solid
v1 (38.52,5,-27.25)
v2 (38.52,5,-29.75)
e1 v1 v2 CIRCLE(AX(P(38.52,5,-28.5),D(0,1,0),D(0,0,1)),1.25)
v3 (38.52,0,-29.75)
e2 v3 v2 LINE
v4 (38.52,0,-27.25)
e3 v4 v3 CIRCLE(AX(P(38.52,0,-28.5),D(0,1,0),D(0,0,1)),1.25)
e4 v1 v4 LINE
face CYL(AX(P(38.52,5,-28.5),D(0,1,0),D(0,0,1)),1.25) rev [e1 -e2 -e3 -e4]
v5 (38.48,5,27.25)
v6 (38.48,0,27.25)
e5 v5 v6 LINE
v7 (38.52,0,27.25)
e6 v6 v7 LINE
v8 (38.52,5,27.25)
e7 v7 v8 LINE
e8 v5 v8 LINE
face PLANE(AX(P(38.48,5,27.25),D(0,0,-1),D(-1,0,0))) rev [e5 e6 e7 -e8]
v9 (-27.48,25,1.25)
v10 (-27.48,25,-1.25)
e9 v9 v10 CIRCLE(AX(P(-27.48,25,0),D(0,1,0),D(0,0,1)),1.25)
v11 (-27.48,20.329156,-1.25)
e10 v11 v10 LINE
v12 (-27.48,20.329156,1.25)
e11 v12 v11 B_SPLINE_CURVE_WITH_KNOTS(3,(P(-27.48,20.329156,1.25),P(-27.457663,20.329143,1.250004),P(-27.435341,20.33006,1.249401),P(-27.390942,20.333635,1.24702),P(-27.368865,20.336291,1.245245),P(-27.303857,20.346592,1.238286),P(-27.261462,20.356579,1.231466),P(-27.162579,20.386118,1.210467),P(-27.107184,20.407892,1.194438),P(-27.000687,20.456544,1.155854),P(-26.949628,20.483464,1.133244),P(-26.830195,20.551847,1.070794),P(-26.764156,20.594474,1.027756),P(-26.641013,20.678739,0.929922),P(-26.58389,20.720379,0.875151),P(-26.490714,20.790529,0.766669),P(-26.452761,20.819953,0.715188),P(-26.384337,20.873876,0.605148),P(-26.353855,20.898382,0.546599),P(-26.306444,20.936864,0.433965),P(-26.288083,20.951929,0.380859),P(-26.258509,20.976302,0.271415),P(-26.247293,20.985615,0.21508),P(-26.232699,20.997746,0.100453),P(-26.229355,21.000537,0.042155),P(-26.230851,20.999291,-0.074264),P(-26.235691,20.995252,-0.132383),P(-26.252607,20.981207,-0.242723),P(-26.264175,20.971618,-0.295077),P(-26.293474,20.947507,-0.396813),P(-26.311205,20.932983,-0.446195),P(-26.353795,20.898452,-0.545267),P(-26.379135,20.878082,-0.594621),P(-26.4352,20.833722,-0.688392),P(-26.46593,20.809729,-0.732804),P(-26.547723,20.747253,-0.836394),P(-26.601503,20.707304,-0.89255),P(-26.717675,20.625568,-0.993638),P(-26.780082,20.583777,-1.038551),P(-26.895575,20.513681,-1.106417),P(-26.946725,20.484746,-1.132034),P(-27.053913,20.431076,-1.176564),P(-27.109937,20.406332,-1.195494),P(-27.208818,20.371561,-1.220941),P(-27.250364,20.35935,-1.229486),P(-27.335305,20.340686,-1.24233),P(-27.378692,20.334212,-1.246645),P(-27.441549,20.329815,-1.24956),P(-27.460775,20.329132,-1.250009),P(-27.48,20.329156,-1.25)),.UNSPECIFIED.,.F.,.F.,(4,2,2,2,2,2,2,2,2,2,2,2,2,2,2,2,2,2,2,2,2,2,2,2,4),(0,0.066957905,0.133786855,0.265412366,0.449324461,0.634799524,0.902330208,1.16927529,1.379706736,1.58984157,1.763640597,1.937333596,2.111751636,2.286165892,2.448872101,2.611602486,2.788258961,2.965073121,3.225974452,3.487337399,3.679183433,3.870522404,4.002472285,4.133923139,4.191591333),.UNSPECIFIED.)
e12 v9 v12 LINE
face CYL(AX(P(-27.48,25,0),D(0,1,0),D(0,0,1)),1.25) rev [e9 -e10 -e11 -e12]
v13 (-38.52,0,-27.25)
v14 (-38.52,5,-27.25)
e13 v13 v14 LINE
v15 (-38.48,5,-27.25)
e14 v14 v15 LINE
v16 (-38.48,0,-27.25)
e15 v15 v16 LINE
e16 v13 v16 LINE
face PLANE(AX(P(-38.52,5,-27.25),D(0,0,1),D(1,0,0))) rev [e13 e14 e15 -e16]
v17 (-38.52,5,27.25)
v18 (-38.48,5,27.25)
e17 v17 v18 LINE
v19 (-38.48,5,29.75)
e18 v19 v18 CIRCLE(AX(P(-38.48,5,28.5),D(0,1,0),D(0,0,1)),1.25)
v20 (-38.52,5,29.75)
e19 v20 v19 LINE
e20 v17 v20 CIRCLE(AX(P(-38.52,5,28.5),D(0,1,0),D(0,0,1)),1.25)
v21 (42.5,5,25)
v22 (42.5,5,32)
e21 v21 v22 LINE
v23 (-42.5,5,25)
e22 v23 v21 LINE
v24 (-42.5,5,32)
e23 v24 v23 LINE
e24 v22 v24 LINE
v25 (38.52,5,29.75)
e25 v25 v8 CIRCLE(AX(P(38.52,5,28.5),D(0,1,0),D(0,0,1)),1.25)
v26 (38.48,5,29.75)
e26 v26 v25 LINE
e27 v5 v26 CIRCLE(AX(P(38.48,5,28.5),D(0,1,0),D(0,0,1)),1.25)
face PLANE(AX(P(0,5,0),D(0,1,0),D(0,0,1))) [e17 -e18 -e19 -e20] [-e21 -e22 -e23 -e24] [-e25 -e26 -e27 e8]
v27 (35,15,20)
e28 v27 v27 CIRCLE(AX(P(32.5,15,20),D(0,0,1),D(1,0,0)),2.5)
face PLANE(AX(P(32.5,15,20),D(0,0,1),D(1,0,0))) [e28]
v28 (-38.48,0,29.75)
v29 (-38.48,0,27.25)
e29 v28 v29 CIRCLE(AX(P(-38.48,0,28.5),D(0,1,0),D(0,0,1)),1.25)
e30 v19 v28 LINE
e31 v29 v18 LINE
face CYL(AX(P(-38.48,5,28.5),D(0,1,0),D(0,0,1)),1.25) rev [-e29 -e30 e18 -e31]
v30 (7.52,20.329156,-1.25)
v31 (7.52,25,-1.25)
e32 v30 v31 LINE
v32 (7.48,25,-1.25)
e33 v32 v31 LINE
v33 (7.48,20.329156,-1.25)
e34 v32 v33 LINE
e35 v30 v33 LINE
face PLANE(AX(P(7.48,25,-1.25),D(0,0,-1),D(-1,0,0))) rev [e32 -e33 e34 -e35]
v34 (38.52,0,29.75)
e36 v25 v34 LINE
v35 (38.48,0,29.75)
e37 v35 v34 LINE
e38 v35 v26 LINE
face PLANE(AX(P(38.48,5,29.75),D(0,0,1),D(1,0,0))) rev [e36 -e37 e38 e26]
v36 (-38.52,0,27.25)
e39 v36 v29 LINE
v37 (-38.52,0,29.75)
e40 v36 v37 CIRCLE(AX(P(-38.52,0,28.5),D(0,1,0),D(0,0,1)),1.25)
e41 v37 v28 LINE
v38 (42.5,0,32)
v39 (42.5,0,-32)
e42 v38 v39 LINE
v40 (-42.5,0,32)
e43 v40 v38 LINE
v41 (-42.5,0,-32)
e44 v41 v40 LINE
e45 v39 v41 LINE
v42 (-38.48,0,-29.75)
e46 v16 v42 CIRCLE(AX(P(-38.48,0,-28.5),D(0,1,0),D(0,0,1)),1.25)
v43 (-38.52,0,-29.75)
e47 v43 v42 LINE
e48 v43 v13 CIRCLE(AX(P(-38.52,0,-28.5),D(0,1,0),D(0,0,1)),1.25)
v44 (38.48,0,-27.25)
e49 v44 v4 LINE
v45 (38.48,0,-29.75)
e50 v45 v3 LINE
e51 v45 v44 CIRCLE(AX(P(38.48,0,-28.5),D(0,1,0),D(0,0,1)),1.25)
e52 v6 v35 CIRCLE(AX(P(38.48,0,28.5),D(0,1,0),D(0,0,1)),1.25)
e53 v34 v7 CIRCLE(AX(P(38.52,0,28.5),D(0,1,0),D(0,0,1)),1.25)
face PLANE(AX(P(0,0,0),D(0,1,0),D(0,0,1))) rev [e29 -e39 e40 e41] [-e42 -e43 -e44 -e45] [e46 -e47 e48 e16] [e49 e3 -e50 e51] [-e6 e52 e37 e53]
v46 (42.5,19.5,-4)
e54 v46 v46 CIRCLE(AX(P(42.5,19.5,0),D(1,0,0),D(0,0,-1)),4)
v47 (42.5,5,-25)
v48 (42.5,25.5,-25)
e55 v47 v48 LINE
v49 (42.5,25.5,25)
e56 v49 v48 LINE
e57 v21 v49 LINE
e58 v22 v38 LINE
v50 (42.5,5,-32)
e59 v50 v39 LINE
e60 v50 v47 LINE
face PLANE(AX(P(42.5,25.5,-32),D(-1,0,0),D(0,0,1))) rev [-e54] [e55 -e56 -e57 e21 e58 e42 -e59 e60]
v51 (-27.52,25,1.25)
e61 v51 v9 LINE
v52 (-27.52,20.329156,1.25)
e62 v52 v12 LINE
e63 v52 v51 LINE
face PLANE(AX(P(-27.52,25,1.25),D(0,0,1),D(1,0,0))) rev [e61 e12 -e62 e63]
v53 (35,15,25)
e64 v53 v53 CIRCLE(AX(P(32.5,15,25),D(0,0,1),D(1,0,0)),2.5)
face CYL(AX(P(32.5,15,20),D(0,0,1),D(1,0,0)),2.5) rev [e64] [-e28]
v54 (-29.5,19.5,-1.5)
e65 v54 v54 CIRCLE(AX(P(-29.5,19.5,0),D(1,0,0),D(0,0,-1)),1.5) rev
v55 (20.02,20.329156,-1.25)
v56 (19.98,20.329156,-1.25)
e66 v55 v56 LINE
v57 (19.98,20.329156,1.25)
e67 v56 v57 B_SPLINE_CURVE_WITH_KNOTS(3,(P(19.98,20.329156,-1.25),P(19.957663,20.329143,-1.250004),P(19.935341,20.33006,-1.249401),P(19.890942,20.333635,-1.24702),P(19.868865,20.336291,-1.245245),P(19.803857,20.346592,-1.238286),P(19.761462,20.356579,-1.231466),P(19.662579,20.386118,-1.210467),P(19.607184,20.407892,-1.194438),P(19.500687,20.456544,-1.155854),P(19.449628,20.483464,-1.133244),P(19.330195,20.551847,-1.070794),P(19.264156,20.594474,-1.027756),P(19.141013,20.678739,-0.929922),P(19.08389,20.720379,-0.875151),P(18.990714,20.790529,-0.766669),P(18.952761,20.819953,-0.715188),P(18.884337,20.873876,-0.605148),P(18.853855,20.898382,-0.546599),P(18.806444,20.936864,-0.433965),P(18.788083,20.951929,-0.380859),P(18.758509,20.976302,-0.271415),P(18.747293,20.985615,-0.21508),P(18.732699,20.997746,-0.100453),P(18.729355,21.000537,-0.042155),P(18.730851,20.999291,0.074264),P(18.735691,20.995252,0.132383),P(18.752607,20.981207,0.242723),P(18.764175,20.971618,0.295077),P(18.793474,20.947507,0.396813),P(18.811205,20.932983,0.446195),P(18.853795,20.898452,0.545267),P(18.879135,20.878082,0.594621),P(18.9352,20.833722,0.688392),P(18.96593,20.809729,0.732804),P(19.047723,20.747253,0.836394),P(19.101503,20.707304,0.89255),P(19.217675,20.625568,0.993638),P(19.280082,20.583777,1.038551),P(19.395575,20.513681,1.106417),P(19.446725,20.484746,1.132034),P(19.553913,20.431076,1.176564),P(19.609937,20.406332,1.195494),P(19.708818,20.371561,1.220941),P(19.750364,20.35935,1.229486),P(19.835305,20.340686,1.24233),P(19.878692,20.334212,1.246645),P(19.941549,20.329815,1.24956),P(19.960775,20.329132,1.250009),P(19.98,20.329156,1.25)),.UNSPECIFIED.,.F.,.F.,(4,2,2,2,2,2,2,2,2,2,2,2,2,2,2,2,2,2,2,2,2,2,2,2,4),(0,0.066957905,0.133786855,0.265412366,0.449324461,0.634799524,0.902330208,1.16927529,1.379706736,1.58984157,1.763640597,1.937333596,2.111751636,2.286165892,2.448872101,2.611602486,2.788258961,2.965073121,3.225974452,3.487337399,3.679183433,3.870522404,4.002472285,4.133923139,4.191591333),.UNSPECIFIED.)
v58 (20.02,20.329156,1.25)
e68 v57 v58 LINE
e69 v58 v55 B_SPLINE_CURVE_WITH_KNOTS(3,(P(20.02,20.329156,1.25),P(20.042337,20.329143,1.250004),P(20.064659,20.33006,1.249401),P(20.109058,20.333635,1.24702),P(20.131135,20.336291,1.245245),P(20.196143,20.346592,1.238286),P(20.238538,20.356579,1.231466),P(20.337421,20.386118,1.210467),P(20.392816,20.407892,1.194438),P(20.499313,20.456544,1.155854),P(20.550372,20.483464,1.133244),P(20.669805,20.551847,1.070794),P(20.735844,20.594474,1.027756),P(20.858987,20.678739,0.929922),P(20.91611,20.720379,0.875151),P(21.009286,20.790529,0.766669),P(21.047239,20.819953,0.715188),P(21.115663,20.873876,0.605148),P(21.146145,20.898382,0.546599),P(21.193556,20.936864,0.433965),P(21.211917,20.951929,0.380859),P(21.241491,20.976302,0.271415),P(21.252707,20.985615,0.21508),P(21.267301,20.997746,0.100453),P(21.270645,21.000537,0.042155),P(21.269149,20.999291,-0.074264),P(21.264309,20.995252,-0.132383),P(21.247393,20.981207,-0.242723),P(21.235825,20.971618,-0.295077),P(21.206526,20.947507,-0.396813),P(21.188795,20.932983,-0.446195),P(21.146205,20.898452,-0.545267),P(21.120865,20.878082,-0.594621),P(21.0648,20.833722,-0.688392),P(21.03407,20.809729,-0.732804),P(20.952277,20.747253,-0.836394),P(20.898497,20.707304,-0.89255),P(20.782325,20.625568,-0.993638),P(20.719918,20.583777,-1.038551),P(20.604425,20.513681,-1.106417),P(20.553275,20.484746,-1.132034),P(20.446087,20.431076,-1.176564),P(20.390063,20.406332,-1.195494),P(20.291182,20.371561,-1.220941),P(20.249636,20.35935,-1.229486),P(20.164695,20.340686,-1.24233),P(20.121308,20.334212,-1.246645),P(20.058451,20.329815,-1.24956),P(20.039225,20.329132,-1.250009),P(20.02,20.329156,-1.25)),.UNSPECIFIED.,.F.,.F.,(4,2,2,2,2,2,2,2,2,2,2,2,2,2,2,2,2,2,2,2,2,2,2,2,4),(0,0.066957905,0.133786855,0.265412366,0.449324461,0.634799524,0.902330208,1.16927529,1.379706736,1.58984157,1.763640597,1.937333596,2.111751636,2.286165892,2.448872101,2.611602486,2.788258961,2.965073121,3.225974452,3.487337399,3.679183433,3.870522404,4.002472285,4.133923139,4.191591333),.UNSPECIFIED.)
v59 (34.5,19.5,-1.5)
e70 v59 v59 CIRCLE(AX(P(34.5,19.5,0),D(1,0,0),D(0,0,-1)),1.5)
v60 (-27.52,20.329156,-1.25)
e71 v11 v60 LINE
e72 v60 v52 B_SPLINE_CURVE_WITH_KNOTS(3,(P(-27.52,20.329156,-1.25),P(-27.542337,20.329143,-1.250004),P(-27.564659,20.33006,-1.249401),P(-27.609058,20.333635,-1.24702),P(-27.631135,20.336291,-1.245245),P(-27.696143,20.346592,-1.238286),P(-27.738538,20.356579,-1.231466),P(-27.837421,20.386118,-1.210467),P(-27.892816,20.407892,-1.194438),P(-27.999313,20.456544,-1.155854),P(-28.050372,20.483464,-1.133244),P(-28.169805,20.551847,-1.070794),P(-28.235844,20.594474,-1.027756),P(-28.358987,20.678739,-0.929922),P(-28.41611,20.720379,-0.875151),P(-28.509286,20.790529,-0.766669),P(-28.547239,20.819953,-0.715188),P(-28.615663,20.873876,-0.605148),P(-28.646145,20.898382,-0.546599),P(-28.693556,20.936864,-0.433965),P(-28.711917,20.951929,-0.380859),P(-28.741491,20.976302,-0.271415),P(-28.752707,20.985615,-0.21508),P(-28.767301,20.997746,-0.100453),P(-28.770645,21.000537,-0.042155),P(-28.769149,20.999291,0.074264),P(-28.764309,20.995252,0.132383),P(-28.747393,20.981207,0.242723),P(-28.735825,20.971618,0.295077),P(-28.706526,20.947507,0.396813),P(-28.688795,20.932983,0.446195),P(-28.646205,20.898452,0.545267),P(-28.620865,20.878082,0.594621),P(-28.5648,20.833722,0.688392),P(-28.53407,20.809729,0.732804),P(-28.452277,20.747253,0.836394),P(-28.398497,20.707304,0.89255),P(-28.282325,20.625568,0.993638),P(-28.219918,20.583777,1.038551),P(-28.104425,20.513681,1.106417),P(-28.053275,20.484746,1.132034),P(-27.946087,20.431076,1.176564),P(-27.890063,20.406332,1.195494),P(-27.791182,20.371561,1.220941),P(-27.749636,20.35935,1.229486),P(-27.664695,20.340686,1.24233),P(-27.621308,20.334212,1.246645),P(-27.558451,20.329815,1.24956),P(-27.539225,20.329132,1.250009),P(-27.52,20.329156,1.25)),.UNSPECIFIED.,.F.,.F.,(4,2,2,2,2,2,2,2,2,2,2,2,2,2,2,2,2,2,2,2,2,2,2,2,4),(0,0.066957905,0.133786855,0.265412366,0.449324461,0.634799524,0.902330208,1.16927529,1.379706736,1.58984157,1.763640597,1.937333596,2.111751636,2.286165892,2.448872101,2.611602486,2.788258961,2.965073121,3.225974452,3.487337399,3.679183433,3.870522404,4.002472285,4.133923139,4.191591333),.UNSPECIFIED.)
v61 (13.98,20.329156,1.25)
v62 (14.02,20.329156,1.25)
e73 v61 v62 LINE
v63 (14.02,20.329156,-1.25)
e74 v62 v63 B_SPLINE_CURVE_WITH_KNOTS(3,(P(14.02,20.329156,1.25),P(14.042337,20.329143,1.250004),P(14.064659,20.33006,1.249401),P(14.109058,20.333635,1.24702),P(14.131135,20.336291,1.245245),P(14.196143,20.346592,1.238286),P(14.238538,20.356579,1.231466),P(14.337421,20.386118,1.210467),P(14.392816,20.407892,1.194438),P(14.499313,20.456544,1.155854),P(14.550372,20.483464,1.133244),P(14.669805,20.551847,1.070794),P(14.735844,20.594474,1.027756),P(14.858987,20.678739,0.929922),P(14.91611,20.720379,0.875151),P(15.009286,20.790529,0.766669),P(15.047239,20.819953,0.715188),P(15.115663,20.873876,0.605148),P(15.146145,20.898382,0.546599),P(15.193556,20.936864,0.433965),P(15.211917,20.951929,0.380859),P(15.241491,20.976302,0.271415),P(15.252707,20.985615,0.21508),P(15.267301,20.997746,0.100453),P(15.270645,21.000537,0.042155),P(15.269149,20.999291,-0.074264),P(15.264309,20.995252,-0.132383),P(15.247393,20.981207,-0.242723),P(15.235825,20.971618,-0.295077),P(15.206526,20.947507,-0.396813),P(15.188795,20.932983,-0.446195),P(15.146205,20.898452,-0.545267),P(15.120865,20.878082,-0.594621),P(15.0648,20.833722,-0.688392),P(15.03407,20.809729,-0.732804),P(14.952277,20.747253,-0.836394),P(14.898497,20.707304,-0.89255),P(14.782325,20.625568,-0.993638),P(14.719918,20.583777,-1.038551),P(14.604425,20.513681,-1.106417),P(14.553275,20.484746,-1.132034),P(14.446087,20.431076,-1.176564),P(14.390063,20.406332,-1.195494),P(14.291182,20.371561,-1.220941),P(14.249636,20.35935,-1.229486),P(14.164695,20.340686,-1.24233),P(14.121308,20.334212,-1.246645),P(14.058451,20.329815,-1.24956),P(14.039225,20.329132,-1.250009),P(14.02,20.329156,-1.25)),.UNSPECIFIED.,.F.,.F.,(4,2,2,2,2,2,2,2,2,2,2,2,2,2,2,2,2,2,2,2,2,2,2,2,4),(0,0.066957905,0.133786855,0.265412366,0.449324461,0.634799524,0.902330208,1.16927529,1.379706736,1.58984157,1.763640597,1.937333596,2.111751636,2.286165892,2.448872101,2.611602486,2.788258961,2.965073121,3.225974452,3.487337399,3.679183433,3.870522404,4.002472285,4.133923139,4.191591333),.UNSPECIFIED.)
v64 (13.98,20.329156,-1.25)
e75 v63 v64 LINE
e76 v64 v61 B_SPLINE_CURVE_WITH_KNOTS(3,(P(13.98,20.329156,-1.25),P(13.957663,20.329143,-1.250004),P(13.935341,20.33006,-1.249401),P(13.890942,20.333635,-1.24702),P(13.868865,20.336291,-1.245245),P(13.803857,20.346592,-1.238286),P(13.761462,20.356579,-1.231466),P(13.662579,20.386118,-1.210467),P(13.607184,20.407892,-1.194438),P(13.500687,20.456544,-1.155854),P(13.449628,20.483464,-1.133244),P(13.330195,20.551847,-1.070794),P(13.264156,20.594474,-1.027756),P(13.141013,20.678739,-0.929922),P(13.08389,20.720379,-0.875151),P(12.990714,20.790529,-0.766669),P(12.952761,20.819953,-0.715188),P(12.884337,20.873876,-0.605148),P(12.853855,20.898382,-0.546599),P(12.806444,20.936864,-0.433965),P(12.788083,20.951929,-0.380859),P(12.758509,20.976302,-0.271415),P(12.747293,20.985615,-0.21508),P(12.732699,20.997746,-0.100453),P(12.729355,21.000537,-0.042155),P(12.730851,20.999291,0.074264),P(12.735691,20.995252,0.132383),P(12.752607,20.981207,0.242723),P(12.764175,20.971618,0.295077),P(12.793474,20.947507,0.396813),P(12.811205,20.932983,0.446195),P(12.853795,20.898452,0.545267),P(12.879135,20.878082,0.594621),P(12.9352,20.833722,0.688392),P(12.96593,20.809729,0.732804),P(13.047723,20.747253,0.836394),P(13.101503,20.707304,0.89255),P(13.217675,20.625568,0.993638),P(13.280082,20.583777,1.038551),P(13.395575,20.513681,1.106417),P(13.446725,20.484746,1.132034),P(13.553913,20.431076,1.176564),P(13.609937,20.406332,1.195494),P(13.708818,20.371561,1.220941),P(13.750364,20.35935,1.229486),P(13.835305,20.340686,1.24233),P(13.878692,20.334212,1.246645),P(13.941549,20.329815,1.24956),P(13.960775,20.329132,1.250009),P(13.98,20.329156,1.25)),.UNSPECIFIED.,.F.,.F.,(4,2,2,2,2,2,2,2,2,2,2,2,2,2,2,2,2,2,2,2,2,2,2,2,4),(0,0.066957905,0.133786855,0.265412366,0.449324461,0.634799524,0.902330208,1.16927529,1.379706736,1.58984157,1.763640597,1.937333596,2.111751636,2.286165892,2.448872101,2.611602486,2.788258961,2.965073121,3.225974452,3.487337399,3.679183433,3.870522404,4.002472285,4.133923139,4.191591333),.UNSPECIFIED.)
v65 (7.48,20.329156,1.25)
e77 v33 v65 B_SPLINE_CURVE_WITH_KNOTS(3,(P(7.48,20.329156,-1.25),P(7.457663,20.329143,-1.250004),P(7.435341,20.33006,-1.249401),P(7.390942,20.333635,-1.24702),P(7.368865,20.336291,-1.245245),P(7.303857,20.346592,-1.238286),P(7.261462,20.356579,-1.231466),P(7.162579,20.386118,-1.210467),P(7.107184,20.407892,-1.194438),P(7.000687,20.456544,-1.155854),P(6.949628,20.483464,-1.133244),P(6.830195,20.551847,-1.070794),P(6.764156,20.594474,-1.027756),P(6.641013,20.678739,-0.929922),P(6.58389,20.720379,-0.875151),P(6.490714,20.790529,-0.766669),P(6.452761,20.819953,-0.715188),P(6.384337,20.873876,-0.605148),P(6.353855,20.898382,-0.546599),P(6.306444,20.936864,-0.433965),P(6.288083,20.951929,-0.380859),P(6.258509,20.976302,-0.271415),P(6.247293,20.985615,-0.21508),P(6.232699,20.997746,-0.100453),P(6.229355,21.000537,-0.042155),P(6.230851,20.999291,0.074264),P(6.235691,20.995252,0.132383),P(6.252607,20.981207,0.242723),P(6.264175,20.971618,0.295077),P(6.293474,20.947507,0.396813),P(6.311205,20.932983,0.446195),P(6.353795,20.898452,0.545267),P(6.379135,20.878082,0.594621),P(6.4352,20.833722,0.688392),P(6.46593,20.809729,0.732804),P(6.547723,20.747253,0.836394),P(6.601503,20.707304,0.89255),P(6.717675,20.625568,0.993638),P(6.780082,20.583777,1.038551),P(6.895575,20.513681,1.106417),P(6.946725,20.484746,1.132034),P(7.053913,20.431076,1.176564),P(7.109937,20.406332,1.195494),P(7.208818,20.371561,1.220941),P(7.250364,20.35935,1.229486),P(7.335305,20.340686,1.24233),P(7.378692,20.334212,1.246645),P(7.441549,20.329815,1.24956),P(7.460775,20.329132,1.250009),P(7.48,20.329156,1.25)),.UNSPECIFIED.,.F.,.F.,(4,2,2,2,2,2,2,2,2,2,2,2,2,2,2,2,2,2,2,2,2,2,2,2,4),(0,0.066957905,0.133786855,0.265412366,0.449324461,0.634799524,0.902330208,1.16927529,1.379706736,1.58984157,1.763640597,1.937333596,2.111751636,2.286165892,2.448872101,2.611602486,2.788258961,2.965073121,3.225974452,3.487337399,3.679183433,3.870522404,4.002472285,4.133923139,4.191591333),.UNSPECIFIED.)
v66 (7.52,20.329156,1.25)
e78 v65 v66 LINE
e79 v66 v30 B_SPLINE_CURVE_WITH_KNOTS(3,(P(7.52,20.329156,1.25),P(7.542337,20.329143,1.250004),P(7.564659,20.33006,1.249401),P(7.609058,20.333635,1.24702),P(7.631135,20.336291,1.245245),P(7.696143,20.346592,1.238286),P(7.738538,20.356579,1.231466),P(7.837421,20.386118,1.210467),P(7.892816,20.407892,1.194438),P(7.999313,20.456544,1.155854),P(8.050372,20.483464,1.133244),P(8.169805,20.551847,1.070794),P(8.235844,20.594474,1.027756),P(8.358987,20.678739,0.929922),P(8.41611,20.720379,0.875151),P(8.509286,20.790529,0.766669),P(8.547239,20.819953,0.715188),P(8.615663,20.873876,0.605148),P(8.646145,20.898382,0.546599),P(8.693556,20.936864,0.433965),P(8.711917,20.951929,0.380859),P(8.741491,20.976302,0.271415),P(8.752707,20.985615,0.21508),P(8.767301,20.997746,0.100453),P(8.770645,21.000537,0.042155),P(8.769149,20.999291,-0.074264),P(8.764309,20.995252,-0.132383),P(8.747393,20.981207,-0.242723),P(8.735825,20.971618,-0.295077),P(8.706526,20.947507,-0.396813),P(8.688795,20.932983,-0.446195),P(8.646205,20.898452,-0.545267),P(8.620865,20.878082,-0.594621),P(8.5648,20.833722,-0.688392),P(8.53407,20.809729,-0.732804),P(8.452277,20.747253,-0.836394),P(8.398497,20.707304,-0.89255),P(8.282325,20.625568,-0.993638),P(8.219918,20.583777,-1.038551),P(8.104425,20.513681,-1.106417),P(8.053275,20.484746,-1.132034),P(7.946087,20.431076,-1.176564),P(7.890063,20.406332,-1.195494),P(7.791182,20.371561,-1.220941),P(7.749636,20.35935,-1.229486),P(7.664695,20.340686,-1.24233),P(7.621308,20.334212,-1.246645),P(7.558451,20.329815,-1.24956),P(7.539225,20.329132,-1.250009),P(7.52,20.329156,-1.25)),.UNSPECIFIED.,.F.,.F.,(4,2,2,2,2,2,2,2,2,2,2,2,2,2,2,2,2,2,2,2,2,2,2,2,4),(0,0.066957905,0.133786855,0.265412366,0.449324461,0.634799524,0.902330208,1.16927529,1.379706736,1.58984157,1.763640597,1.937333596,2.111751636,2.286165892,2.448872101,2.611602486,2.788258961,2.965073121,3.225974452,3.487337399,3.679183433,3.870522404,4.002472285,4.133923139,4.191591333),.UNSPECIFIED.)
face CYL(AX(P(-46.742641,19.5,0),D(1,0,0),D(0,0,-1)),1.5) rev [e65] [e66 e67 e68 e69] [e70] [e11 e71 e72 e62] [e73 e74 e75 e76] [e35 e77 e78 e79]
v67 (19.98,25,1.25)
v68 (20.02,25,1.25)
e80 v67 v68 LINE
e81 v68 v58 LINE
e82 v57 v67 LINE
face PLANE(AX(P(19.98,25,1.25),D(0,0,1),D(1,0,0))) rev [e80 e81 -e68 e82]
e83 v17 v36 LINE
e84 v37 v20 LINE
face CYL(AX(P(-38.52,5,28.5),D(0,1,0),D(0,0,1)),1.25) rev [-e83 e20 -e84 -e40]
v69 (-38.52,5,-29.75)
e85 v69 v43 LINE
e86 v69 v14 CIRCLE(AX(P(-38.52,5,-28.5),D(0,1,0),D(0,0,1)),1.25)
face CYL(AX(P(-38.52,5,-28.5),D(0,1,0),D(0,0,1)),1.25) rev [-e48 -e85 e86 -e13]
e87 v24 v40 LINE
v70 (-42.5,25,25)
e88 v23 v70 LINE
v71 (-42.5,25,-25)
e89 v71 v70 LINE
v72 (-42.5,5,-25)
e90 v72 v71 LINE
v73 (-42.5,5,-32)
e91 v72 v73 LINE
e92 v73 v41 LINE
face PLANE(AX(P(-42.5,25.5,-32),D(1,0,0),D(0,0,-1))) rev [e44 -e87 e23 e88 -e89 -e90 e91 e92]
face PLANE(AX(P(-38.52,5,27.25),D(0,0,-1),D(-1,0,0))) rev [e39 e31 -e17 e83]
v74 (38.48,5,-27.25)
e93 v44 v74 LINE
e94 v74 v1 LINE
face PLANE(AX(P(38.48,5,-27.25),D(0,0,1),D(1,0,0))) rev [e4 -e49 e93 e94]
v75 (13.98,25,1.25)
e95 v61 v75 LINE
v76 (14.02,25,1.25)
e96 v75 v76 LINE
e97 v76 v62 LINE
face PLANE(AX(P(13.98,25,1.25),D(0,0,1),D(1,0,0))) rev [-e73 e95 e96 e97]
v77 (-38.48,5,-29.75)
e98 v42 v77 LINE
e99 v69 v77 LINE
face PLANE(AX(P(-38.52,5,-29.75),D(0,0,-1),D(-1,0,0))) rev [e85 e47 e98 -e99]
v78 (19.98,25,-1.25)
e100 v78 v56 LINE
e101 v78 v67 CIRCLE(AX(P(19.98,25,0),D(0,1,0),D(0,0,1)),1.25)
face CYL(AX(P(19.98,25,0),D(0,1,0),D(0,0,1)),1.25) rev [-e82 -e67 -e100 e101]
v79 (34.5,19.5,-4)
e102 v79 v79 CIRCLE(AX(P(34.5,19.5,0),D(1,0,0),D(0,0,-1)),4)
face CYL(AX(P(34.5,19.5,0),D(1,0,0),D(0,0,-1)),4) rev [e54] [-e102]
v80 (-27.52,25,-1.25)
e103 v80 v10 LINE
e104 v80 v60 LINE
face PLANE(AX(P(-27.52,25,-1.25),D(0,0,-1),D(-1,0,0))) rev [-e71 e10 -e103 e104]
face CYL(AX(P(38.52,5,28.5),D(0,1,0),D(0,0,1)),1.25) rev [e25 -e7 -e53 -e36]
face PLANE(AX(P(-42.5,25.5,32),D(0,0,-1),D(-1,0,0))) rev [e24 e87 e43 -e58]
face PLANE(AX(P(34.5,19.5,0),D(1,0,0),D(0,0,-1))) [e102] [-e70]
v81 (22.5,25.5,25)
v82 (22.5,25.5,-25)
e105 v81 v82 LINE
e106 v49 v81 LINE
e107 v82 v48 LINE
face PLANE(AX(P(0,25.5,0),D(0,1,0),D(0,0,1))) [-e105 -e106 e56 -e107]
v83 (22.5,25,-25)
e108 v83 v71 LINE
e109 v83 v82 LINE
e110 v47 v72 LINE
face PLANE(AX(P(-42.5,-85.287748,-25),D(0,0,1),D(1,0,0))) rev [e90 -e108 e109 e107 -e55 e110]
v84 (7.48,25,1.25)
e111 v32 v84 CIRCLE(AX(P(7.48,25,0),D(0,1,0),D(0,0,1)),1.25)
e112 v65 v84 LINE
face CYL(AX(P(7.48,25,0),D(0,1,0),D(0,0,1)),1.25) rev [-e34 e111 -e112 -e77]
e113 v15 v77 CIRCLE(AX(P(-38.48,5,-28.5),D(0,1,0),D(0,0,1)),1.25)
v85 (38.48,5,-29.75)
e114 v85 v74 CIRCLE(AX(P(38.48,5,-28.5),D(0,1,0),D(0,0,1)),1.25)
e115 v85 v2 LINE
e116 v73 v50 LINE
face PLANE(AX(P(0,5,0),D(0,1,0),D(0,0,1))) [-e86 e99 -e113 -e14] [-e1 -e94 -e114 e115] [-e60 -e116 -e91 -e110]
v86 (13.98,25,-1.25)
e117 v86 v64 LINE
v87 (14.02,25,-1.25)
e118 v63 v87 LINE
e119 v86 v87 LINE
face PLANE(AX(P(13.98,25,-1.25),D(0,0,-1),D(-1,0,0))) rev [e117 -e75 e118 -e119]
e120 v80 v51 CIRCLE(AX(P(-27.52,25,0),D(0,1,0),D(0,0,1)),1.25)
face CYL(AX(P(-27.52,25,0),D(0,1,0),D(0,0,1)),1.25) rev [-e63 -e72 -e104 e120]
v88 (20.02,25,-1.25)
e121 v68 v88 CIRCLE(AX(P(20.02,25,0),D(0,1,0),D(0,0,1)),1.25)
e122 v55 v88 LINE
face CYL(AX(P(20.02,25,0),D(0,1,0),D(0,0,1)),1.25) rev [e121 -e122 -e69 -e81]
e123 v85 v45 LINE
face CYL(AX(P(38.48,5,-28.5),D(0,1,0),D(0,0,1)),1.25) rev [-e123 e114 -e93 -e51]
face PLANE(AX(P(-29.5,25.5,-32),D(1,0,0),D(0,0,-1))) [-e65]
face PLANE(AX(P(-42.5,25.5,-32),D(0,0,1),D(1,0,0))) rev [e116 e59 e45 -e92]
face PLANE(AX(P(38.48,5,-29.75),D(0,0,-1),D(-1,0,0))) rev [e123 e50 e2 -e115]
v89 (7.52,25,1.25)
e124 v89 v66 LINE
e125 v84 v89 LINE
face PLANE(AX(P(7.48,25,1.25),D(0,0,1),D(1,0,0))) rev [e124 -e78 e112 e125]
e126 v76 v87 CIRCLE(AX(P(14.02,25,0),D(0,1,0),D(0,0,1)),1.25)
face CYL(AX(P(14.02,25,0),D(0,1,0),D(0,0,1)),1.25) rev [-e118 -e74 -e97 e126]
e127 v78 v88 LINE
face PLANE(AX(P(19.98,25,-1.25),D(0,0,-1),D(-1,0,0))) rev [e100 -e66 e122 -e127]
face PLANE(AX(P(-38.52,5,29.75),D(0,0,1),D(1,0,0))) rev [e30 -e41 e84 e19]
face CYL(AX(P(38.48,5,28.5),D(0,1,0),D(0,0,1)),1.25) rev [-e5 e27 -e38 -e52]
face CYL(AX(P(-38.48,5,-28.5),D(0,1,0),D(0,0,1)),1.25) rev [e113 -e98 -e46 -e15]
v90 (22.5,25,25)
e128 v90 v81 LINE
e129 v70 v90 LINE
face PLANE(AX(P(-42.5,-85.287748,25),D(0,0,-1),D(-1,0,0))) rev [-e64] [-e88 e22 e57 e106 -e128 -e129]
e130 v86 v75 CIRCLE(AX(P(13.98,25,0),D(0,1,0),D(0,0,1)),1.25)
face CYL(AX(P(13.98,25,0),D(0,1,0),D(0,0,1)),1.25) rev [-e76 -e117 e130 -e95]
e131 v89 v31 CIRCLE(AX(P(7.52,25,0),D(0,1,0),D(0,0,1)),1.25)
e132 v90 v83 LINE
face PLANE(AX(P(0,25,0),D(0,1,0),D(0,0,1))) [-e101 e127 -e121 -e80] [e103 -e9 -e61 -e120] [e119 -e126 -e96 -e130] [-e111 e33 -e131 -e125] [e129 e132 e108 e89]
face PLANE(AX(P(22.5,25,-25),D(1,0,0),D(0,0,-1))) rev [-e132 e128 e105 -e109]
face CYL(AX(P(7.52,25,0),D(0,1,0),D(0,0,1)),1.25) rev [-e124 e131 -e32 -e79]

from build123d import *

# Parameters (mm, degrees)
SKETCH1_W                            = 85
SKETCH1_H                            = 64
BOSS_EXTRUDE1_DEPTH                  = 25.5
SKETCH2_W                            = 85
SKETCH2_H                            = 7
CUT_EXTRUDE1_DEPTH                   = 20.5
SKETCH3_W                            = 65
SKETCH3_H                            = 50
CUT_EXTRUDE2_DEPTH                   = 0.5
SKETCH4_R                            = 2.5
CUT_EXTRUDE3_DEPTH                   = 5
SKETCH5_R                            = 4
CUT_EXTRUDE4_DEPTH                   = 8
SKETCH6_R                            = 1.5
CUT_EXTRUDE5_DEPTH                   = 64
TAP_DRILL_SLOT_FOR_M3X0_5_TAP2_DEPTH = 5
TAP_START                            = 20.329155487
TAP_DRILL_SLOT_FOR_M3X0_5_TAP1_DEPTH = 4.670844513


# Read off the part's stored shape, not the designer's step: Tap Drill Slot for M3x0.5 Tap2, Tap Drill Slot for M3x0.5 Tap1
with BuildPart() as part:
    # Sketch1 → Boss-Extrude1 (new body)
    with BuildSketch(Plane(origin=(0, 0, 0), x_dir=(1, 0, 0), z_dir=(0, 1, 0))):
        Rectangle(SKETCH1_W, SKETCH1_H)
    extrude(amount=BOSS_EXTRUDE1_DEPTH)

    # Sketch2 → Cut-Extrude1 (cut)
    with BuildSketch(Plane(origin=(0, 25.5, 0), x_dir=(1, 0, 0), z_dir=(0, 1, 0))):
        with Locations((0, 28.5)):
            Rectangle(SKETCH2_W, SKETCH2_H)
        with Locations((0, -28.5)):
            Rectangle(SKETCH2_W, SKETCH2_H)
    extrude(amount=-CUT_EXTRUDE1_DEPTH, mode=Mode.SUBTRACT)

    # Sketch3 → Cut-Extrude2 (cut)
    with BuildSketch(Plane(origin=(0, 25.5, 0), x_dir=(1, 0, 0), z_dir=(0, 1, 0))):
        with Locations((-10, 0)):
            Rectangle(SKETCH3_W, SKETCH3_H)
    extrude(amount=-CUT_EXTRUDE2_DEPTH, mode=Mode.SUBTRACT)

    # Sketch4 → Cut-Extrude3 (cut)
    with BuildSketch(Plane.XY.offset(25)):
        with Locations((32.5, 15)):
            Circle(SKETCH4_R)
    extrude(amount=-CUT_EXTRUDE3_DEPTH, mode=Mode.SUBTRACT)

    # Sketch5 → Cut-Extrude4 (cut)
    with BuildSketch(Plane(origin=(42.5, 0, 0), x_dir=(0, 0, -1), z_dir=(1, 0, 0))):
        with Locations((0, 19.5)):
            Circle(SKETCH5_R)
    extrude(amount=-CUT_EXTRUDE4_DEPTH, mode=Mode.SUBTRACT)

    # Sketch6 → Cut-Extrude5 (cut)
    with BuildSketch(Plane(origin=(34.5, 0, 0), x_dir=(0, 0, -1), z_dir=(1, 0, 0))):
        with Locations((0, 19.5)):
            Circle(SKETCH6_R)
    extrude(amount=-CUT_EXTRUDE5_DEPTH, mode=Mode.SUBTRACT)

    # Tap Drill Slot for M3x0.5 Tap2 outline → Tap Drill Slot for M3x0.5 Tap2 (cut)
    with BuildSketch(Plane(origin=(0, 0, 0), x_dir=(1, 0, 0), z_dir=(0, 1, 0))):
        with BuildLine():
            Line((-38.52, -29.75), (-38.48, -29.75))
            ThreePointArc((-38.48, -29.75), (-37.23, -28.5), (-38.48, -27.25))
            Line((-38.48, -27.25), (-38.52, -27.25))
            ThreePointArc((-38.52, -27.25), (-39.77, -28.5), (-38.52, -29.75))
        make_face()
        with BuildLine():
            ThreePointArc((38.52, -29.75), (39.77, -28.5), (38.52, -27.25))
            Line((38.52, -27.25), (38.48, -27.25))
            ThreePointArc((38.48, -27.25), (37.23, -28.5), (38.48, -29.75))
            Line((38.48, -29.75), (38.52, -29.75))
        make_face()
        with BuildLine():
            Line((38.48, 27.25), (38.52, 27.25))
            ThreePointArc((38.52, 27.25), (39.77, 28.5), (38.52, 29.75))
            Line((38.52, 29.75), (38.48, 29.75))
            ThreePointArc((38.48, 29.75), (37.23, 28.5), (38.48, 27.25))
        make_face()
        with BuildLine():
            ThreePointArc((-38.48, 27.25), (-37.23, 28.5), (-38.48, 29.75))
            Line((-38.48, 29.75), (-38.52, 29.75))
            ThreePointArc((-38.52, 29.75), (-39.77, 28.5), (-38.52, 27.25))
            Line((-38.52, 27.25), (-38.48, 27.25))
        make_face()
    extrude(amount=TAP_DRILL_SLOT_FOR_M3X0_5_TAP2_DEPTH, mode=Mode.SUBTRACT)

    # Tap Drill Slot for M3x0.5 Tap1 outline → Tap Drill Slot for M3x0.5 Tap1 (cut)
    with BuildSketch(Plane(origin=(0, 0, 0), x_dir=(1, 0, 0), z_dir=(0, 1, 0)).offset(TAP_START)):
        with BuildLine():
            ThreePointArc((19.98, 1.25), (18.73, 0), (19.98, -1.25))
            Line((19.98, -1.25), (20.02, -1.25))
            ThreePointArc((20.02, -1.25), (21.27, 0), (20.02, 1.25))
            Line((20.02, 1.25), (19.98, 1.25))
        make_face()
        with BuildLine():
            ThreePointArc((13.98, 1.25), (12.73, 0), (13.98, -1.25))
            Line((13.98, -1.25), (14.02, -1.25))
            ThreePointArc((14.02, -1.25), (15.27, 0), (14.02, 1.25))
            Line((14.02, 1.25), (13.98, 1.25))
        make_face()
        with BuildLine():
            ThreePointArc((7.48, 1.25), (6.23, 0), (7.48, -1.25))
            Line((7.48, -1.25), (7.52, -1.25))
            ThreePointArc((7.52, -1.25), (8.77, 0), (7.52, 1.25))
            Line((7.52, 1.25), (7.48, 1.25))
        make_face()
        with BuildLine():
            ThreePointArc((-27.52, 1.25), (-28.77, 0), (-27.52, -1.25))
            Line((-27.52, -1.25), (-27.48, -1.25))
            ThreePointArc((-27.48, -1.25), (-26.23, 0), (-27.48, 1.25))
            Line((-27.48, 1.25), (-27.52, 1.25))
        make_face()
    extrude(amount=TAP_DRILL_SLOT_FOR_M3X0_5_TAP1_DEPTH, mode=Mode.SUBTRACT)


solid = part.part
